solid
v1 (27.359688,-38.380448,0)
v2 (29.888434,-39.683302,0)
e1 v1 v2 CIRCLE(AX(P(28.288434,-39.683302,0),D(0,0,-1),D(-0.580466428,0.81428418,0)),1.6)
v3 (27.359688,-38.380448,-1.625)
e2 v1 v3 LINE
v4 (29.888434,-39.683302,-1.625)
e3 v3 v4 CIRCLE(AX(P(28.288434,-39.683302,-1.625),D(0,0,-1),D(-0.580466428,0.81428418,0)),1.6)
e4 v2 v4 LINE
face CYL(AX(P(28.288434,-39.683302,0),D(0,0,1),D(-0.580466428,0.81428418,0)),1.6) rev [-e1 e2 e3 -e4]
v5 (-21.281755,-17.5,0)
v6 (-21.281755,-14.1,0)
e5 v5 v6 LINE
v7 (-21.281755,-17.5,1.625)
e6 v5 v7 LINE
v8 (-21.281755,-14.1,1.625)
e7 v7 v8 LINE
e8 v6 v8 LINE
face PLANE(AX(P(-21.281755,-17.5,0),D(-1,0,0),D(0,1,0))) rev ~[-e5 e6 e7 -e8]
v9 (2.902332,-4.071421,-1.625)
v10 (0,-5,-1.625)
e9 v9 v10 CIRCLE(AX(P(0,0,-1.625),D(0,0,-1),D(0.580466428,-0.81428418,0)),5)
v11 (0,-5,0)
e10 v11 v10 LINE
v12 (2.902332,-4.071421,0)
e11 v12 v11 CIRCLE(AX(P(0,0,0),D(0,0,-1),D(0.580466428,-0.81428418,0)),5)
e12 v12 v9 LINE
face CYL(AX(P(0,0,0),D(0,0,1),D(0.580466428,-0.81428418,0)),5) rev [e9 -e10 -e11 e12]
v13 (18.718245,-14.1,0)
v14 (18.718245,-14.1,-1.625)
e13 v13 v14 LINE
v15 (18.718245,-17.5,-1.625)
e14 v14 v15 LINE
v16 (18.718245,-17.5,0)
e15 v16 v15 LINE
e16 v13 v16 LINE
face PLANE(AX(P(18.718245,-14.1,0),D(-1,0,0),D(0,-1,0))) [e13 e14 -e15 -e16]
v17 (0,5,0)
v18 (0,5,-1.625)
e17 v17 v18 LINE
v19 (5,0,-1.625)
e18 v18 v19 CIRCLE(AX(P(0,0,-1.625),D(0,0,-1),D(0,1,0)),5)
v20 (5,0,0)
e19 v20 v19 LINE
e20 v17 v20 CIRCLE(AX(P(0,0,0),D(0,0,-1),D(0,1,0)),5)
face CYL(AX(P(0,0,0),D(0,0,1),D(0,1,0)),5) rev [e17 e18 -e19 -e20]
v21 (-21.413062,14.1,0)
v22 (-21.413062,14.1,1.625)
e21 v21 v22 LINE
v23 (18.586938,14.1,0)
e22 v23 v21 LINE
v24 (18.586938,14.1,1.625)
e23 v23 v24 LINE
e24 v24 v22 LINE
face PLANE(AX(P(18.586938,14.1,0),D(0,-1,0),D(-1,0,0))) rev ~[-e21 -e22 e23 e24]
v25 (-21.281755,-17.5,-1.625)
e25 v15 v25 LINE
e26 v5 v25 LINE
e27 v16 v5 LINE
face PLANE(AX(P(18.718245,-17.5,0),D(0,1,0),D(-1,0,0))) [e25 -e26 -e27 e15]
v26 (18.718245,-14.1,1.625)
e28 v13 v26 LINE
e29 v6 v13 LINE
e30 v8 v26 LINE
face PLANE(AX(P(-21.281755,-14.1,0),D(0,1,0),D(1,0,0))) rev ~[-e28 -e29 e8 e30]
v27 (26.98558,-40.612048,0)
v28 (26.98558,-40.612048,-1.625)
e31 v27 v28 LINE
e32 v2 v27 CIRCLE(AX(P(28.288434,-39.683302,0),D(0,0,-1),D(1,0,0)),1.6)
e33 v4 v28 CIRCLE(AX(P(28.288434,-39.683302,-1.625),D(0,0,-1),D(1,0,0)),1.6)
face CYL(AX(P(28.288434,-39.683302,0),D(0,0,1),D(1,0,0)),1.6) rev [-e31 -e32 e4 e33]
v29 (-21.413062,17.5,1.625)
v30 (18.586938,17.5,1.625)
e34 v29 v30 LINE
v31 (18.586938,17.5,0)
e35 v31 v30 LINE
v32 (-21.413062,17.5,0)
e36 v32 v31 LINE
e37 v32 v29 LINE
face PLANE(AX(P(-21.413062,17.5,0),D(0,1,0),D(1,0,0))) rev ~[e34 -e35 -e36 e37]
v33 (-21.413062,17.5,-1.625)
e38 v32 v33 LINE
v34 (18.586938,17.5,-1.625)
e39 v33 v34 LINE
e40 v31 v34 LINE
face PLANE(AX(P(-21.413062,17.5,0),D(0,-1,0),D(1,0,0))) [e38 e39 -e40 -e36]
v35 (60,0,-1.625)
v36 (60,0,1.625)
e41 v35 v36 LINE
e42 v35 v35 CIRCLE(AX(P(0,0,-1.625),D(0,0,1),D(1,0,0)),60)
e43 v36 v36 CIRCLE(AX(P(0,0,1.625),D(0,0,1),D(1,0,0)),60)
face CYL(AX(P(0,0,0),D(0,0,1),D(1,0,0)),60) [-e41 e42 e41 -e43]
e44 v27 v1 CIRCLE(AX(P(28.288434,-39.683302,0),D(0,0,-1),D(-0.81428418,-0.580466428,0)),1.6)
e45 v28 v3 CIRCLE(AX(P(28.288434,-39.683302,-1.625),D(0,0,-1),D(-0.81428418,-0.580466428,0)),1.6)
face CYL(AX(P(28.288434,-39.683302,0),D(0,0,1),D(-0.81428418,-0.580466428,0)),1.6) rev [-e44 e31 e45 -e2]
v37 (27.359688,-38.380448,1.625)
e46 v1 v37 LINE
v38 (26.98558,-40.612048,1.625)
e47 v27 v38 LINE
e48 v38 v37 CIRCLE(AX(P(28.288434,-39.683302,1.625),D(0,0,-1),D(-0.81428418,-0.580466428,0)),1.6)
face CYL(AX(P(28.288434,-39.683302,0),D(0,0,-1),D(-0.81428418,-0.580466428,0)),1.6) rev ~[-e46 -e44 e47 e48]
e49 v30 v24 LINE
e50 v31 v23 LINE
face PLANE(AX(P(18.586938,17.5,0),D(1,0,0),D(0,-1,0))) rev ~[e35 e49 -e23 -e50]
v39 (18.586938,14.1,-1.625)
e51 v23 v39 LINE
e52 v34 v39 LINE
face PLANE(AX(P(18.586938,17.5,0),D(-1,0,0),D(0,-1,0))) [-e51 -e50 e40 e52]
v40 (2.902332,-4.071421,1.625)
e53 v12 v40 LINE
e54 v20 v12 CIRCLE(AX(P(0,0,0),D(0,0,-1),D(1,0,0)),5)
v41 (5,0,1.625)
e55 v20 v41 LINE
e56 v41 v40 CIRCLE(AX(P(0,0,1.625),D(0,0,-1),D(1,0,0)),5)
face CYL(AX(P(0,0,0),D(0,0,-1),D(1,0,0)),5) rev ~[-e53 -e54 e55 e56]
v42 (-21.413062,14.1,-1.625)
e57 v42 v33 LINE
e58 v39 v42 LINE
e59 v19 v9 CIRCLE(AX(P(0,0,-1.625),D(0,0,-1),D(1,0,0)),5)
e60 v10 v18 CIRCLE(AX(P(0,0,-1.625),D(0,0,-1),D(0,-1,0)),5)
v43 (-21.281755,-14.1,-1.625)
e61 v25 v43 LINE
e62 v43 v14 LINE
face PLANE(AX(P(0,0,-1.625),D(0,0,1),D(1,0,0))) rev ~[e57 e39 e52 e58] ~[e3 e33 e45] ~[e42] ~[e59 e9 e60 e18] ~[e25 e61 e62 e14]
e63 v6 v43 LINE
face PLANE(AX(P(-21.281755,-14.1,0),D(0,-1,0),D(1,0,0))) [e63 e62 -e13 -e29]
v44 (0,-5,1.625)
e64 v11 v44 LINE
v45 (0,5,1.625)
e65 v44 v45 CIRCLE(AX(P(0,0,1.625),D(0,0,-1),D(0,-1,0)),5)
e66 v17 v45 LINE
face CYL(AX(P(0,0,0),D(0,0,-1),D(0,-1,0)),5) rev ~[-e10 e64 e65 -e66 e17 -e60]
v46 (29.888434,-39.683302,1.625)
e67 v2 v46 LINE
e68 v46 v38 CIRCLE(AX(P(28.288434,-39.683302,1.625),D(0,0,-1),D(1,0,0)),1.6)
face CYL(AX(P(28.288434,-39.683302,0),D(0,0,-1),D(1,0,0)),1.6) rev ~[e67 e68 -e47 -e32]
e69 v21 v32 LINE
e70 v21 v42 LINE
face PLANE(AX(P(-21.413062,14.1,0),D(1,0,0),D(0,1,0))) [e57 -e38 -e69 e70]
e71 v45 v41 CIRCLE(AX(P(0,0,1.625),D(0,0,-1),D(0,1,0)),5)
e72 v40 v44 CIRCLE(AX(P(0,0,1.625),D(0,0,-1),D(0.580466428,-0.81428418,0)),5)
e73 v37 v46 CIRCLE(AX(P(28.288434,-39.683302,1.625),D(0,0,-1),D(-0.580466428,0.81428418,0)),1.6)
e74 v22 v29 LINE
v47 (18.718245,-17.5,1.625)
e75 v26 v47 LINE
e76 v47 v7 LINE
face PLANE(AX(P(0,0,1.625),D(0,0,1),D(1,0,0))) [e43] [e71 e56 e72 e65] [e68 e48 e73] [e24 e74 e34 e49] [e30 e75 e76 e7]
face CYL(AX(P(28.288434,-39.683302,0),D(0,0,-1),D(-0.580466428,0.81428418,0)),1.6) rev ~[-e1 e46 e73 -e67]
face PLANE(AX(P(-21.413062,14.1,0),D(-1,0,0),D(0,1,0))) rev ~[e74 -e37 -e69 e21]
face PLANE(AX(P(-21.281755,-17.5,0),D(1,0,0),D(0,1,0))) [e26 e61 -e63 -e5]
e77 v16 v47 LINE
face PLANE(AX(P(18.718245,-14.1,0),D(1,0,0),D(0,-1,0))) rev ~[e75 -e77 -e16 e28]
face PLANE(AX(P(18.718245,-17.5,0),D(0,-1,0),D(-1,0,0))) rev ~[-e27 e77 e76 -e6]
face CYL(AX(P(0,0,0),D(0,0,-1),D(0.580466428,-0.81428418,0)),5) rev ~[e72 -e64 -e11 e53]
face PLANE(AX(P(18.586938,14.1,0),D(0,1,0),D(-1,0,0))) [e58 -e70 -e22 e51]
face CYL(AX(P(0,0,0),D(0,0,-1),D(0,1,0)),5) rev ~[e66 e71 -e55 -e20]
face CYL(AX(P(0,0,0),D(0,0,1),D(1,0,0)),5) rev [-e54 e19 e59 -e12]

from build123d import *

# Parameters (mm, degrees)
F1_DEPTH = 1.625


# Not quite as in the source:
# - a feature names something its author has since deleted; it is built from what else it names


with BuildPart() as f1:
    # F0 (on Top) → F1 (new body, symmetric)
    with BuildSketch(Plane.XY):
        with BuildLine():
            ThreePointArc((-0.2115118035, -59.9996271885), (42.3515601353, -42.5011217982), (60, 0))
            ThreePointArc((60, 0), (-42.3515601353, 42.5011217982), (-0.2115118035, -59.9996271885))
        make_face()
        with BuildLine():
            ThreePointArc((29.8884344963, -39.6833022032), (28.7759960304, -41.2072063178), (26.9855798083, -40.6120484882))
            ThreePointArc((26.9855798083, -40.6120484882), (26.7104543153, -39.4187676146), (27.3596882112, -38.3804475152))
            ThreePointArc((27.3596882112, -38.3804475152), (29.0212393625, -38.2609812028), (29.8884344963, -39.6833022032))
        make_face(mode=Mode.SUBTRACT)
        with BuildLine():
            Line((18.7182445079, -17.5), (12.4749599, -17.5))
            Line((12.4749599, -17.5), (0, -17.5))
            Line((0, -17.5), (-21.2817554921, -17.5))
            Line((-21.2817554921, -17.5), (-21.2817554921, -14.1))
            Line((-21.2817554921, -14.1), (-11.0323727131, -14.1))
            Line((-11.0323727131, -14.1), (-11.0323727131, 14.1))
            Line((-11.0323727131, 14.1), (-21.4130617678, 14.1))
            Line((-21.4130617678, 14.1), (-21.4130617678, 17.5))
            Line((-21.4130617678, 17.5), (0, 17.5))
            Line((0, 17.5), (18.5869382322, 17.5))
            Line((18.5869382322, 17.5), (18.5869382322, 14.1))
            Line((18.5869382322, 14.1), (0, 14.1))
            Line((0, 14.1), (0, 5))
            ThreePointArc((0, 5), (3.5355339059, 3.5355339059), (5, 0))
            ThreePointArc((5, 0), (4.4447531261, -2.290015207), (2.9023321408, -4.0714209))
            Line((2.9023321408, -4.0714209), (10.0512534051, -14.1))
            Line((10.0512534051, -14.1), (18.7182445079, -14.1))
            Line((18.7182445079, -14.1), (18.7182445079, -17.5))
        make_face(mode=Mode.SUBTRACT)
        with BuildLine():
            Line((0, -14.1), (10.0512534051, -14.1))
            Line((10.0512534051, -14.1), (2.9023321408, -4.0714209))
            ThreePointArc((2.9023321408, -4.0714209), (1.5236297943, -4.762200358), (0, -5))
            Line((0, -5), (0, -14.1))
        make_face()
        with BuildLine():
            Line((-11.0323727131, -14.1), (0, -14.1))
            Line((0, -14.1), (0, -5))
            ThreePointArc((0, -5), (-5, 0), (0, 5))
            Line((0, 5), (0, 14.1))
            Line((0, 14.1), (-11.0323727131, 14.1))
            Line((-11.0323727131, 14.1), (-11.0323727131, -14.1))
        make_face()
    extrude(amount=F1_DEPTH, both=True)


solid = f1.part
